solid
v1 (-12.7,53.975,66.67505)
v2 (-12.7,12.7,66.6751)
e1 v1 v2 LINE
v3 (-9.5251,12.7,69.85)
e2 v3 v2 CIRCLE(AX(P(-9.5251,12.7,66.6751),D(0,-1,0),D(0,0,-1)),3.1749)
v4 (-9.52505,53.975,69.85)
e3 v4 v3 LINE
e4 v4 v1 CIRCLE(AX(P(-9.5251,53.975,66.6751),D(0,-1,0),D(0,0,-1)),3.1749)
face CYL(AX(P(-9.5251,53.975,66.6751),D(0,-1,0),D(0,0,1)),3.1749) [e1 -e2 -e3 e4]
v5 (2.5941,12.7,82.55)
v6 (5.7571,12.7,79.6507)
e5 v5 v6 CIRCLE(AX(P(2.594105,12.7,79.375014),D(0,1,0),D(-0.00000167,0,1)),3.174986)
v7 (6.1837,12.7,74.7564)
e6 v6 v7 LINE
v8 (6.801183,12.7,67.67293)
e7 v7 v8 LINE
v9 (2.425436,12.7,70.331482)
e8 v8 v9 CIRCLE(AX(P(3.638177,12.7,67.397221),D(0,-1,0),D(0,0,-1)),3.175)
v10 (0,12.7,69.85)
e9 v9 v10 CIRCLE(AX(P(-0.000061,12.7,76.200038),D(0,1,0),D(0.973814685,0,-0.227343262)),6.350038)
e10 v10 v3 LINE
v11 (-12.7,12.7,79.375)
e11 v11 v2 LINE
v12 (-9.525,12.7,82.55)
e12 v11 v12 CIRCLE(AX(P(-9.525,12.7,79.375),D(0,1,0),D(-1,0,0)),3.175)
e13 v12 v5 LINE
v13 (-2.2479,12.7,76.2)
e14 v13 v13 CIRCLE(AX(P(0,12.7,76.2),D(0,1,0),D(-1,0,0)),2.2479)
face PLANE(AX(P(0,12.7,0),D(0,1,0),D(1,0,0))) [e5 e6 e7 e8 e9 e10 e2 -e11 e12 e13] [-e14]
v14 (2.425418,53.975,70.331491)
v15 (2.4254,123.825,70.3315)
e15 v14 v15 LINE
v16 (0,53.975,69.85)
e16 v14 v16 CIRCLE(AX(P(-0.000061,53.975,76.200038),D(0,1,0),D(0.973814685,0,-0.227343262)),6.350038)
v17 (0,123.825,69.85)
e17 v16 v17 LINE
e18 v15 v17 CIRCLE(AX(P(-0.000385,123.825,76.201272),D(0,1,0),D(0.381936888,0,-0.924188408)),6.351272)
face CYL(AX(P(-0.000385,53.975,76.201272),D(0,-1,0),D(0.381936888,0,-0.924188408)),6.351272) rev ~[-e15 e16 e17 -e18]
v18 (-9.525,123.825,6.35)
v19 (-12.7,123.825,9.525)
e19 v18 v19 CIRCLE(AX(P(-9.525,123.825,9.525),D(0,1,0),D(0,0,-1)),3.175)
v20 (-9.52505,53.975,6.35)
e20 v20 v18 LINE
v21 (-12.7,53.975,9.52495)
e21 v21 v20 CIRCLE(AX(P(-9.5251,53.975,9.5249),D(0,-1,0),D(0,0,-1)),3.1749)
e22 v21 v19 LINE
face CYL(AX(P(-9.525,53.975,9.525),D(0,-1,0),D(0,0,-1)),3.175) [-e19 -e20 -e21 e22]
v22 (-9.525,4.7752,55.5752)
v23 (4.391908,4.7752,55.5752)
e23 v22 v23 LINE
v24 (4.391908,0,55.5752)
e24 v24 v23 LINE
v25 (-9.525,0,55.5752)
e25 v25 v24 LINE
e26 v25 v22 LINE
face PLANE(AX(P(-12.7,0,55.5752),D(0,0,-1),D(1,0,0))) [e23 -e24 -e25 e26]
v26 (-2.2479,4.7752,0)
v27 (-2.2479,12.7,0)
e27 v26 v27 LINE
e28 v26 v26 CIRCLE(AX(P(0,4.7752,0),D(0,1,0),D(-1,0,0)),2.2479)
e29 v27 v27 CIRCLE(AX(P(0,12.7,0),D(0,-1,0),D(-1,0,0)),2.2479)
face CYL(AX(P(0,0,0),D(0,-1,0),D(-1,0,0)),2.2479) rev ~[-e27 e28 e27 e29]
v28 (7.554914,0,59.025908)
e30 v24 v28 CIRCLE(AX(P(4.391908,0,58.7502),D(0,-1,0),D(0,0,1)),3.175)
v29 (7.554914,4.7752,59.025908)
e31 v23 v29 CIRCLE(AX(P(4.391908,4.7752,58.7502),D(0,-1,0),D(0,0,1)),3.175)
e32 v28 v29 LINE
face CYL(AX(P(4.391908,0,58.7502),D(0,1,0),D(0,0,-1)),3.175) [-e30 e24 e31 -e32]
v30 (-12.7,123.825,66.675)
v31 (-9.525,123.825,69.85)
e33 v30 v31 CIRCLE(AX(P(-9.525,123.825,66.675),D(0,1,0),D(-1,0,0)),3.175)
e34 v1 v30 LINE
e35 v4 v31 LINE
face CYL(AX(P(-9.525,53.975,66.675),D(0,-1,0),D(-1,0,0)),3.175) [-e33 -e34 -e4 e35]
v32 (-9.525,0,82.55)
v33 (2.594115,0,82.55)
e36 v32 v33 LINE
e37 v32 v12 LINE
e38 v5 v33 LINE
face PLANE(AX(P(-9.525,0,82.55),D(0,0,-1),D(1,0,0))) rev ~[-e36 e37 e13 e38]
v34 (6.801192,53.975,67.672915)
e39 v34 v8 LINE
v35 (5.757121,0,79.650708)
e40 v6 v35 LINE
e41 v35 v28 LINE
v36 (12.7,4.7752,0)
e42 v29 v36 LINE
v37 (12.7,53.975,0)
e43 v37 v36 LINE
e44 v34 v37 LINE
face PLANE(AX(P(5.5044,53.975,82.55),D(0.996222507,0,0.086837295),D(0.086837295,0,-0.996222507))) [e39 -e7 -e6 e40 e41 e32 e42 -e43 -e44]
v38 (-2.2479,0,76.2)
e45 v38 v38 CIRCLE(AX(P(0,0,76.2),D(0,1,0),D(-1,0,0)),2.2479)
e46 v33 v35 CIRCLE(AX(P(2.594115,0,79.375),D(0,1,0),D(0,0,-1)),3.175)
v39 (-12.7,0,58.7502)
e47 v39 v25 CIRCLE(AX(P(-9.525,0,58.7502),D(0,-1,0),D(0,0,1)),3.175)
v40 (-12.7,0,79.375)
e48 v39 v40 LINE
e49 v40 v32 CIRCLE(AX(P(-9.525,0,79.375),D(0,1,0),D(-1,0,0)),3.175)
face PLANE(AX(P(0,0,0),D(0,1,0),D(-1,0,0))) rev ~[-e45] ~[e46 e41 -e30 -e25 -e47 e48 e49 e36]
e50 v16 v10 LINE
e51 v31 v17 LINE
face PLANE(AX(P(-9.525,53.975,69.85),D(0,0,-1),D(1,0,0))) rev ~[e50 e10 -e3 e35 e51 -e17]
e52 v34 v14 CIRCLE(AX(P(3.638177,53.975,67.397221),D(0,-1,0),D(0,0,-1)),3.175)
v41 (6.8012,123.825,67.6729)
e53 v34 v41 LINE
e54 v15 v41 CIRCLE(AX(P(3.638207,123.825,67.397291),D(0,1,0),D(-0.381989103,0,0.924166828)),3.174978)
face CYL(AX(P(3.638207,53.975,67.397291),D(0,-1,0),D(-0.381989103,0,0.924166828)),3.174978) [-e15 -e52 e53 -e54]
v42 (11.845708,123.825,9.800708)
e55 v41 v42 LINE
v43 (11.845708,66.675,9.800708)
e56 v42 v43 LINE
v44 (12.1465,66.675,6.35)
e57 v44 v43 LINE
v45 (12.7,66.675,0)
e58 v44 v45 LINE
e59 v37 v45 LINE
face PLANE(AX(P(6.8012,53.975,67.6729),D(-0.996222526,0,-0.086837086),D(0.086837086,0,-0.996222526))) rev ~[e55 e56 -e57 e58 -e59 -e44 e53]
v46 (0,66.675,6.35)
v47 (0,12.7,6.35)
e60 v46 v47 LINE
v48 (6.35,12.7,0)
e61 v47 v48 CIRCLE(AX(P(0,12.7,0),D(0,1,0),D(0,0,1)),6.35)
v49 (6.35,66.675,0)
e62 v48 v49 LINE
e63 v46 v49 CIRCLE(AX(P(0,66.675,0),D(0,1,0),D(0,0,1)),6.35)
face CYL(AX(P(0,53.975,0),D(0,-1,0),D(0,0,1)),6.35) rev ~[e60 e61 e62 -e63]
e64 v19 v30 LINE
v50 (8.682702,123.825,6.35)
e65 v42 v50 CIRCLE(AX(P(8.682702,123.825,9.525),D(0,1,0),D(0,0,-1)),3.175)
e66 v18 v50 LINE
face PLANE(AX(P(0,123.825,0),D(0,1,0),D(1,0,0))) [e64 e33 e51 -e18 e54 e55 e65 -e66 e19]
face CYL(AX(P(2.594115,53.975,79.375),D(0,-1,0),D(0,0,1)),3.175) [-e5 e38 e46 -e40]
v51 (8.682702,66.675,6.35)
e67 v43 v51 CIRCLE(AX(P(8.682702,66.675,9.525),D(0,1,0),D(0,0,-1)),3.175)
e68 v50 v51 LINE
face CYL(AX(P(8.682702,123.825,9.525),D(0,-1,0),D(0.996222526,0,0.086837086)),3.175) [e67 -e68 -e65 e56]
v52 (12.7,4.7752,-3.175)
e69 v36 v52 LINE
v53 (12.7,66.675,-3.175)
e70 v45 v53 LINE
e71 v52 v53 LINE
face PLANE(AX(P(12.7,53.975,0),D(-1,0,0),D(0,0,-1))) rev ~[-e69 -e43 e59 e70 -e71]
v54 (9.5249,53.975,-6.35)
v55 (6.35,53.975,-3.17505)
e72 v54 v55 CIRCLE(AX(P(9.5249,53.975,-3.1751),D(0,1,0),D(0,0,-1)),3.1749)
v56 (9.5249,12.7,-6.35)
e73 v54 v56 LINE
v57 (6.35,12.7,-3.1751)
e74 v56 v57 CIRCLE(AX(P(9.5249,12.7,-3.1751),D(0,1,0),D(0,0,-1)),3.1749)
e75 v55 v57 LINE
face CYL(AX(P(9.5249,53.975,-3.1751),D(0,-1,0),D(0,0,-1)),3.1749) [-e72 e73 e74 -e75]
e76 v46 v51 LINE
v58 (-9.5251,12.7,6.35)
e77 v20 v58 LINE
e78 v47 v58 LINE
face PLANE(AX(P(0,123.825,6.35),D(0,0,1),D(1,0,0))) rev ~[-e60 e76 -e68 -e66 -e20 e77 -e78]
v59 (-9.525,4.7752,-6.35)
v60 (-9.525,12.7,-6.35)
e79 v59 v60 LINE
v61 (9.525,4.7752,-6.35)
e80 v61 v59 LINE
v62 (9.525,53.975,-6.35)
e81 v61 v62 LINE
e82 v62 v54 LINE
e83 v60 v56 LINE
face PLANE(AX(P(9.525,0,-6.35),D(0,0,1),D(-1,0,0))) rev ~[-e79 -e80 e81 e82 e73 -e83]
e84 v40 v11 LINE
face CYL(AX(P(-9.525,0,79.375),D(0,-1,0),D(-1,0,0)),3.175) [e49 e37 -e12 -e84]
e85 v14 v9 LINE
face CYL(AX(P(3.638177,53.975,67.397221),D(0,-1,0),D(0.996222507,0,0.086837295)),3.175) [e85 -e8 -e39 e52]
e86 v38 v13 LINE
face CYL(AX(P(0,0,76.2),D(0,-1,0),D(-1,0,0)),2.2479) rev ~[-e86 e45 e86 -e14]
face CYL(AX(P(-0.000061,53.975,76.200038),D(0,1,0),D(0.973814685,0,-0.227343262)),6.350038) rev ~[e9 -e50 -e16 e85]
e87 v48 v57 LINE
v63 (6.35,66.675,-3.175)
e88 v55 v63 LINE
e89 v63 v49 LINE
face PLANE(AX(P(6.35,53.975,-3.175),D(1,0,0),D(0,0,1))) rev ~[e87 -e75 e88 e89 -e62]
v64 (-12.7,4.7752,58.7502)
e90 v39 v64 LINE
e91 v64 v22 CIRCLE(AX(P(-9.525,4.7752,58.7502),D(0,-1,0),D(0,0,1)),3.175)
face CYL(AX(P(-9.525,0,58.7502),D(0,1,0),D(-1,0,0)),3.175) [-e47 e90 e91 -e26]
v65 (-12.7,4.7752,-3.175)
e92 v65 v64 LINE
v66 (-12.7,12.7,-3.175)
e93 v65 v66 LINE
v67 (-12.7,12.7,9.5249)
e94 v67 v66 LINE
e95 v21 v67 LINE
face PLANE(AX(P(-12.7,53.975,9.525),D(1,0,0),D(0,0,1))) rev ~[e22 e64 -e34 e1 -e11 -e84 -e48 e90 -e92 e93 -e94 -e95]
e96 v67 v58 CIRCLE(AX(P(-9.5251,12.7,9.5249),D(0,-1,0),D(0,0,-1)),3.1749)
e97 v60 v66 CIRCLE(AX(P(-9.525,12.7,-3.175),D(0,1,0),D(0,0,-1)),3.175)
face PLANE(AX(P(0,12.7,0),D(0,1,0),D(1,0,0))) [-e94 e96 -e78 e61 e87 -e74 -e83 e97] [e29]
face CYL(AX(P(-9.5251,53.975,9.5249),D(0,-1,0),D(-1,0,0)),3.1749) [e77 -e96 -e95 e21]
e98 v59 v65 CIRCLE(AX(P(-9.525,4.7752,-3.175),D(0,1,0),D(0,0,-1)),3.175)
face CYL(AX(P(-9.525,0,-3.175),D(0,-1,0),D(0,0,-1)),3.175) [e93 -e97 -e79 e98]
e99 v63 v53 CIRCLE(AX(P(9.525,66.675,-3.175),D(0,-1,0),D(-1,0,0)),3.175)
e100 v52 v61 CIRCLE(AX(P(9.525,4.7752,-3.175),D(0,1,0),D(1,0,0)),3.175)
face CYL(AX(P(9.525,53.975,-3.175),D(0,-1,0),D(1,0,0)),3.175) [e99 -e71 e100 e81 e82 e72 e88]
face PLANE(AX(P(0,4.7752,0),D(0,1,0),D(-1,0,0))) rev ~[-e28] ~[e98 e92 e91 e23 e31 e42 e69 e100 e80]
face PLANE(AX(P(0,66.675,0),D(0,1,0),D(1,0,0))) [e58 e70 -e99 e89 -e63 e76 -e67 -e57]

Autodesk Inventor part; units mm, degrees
ref_plane "YZ Plane" through (0, 0, 0) normal (1, 0, 0) x (0, 1, 0)
ref_plane "XZ Plane" through (0, 0, 0) normal (0, 1, 0) x (-1, 0, 0)
ref_plane "XY Plane" through (0, 0, 0) normal (0, 0, 1) x (1, 0, 0)
sketch "Sketch1" plane through (0, 0, 0) normal (0, 1, 0) x (-1, 0, 0)
  circle A0 centre (0, 0) radius 2.2479
  line L0 (0, 0) -> (0, 76.2) construction
  circle A1 centre (0, 76.2) radius 2.2479
  line L1 (9.525, 82.55) -> (-9.525, 82.55)
  line L2 (-12.7, 79.375) -> (-12.7, -3.175)
  line L3 (-9.525, -6.35) -> (9.525, -6.35)
  line L4 (12.7, -3.175) -> (12.7, 79.375)
  line L5 (0, 0) -> (0, 55.5752) construction
  line L6 (12.7, 55.5752) -> (-12.7, 55.5752) construction
  line L7 (12.7, 55.5752) -> (-12.7, 55.5752)
  arc A2 (12.7, 79.375) -> (9.525, 82.55) centre (9.525, 79.375) ccw
  arc A3 (-9.525, 82.55) -> (-12.7, 79.375) centre (-9.525, 79.375) ccw
  arc A4 (9.525, -6.35) -> (12.7, -3.175) centre (9.525, -3.175) ccw
  arc A5 (-12.7, -3.175) -> (-9.525, -6.35) centre (-9.525, -3.175) ccw
  point P0 (-12.7, -6.35)
  point P1 (12.7, -6.35)
  dimension "d0" = 4.4958
  dimension "d1" = 4.4958
  dimension "d2" = 76.2
  dimension "d3" = 25.4
  dimension "d4" = 12.7
  dimension "d5" = 6.35
  dimension "d6" = 6.35
  dimension "d7" = 55.5752
  dimension "d8" = 3.175
extrude "Extrusion1" add sketch "Sketch1" along normal blind 53.975
sketch "Sketch2" plane through (0, 53.975, 0) normal (0, 1, 0) x (1, 0, 0)
  line L0 (12.7, -79.375) -> (12.7, 3.175) projected
  arc A0 (12.7, 3.175) -> (9.525, 6.35) centre (9.525, 3.175) ccw projected
  line L1 (9.525, 6.35) -> (-9.525, 6.35) projected
  arc A1 (-9.525, 6.35) -> (-12.7, 3.175) centre (-9.525, 3.175) ccw projected
  line L2 (-12.7, 3.175) -> (-12.7, -79.375) projected
  arc A2 (-12.7, -79.375) -> (-9.525, -82.55) centre (-9.525, -79.375) ccw projected
  line L3 (-9.525, -82.55) -> (9.525, -82.55) projected
  arc A3 (9.525, -82.55) -> (12.7, -79.375) centre (9.525, -79.375) ccw projected
  circle A4 centre (0, 0) radius 2.2479 projected
  circle A5 centre (0, -76.2) radius 2.2479 projected
  line L4 (5.5044, -82.55) -> (12.7, 0)
  line L5 (12.7, -79.375) -> (12.7, 3.175) projected
  line L6 (-12.7, 0) -> (12.7, 0) construction
  line L7 (2.2479, -76.2) -> (6.0579, -76.2) construction
  line L8 (5.5044, -82.55) -> (12.7, -82.55)
  line L9 (12.7, -82.55) -> (12.7, 0)
  point P0 (12.7, 0)
  dimension "d14" = 3.81
extrude "Extrusion3" cut sketch "Sketch2" against normal through all contours A3 L3 L4 L0
fillet "Fillet2" radius 3.175 1 edges at (5.5044, 26.9875, 82.55)
sketch "Sketch3" plane through (0, 53.975, 0) normal (0, 1, 0) x (1, 0, 0)
  point P0 (0, 0)
extrude "Extrusion4" cut sketch "Sketch1" along normal blind 4.7752 contours L4 A4 L3 A5 L2 L7
fillet "Fillet3" radius 3.175 2 edges at (7.8557, 2.3876, 55.5752) (-12.7, 2.3876, 55.5752)
sketch "Sketch5" plane through (0, 53.975, 0) normal (0, 1, 0) x (1, 0, 0)
  circle A0 centre (0, -76.2) radius 2.2479 projected
  circle A1 centre (0, 0) radius 2.2479 projected
  arc A2 (2.5941, -82.55) -> (5.7571, -79.6507) centre (2.5941, -79.375) ccw projected
  line L0 (5.7571, -79.6507) -> (12.7, 0) projected
  line L1 (12.7, 0) -> (12.7, 3.175) projected
  arc A3 (12.7, 3.175) -> (9.525, 6.35) centre (9.525, 3.175) ccw projected
  line L2 (9.525, 6.35) -> (-9.525, 6.35) projected
  arc A4 (-9.525, 6.35) -> (-12.7, 3.175) centre (-9.525, 3.175) ccw projected
  line L3 (-12.7, 3.175) -> (-12.7, -79.375) projected
  arc A5 (-12.7, -79.375) -> (-9.525, -82.55) centre (-9.525, -79.375) ccw projected
  line L4 (-9.525, -82.55) -> (2.5941, -82.55) projected
  circle A6 centre (0, 0) radius 6.35 construction
  line L5 (6.35, 0) -> (6.35, 6.35)
  line L6 (0, -6.35) -> (-12.7, -6.35)
  arc A7 (0, -6.35) -> (6.35, 0) centre (0, 0) ccw
  line L7 (6.35, 6.35) -> (-12.7, 6.35)
  line L8 (-12.7, 6.35) -> (-12.7, -6.35)
  circle A8 centre (0, -76.2) radius 6.35 construction
  line L9 (0, -69.85) -> (-12.7, -69.85)
  line L10 (6.1837, -74.7564) -> (5.5044, -82.55)
  line L11 (5.5044, -82.55) -> (-12.7, -82.55)
  line L12 (-12.7, -82.55) -> (-12.7, -69.85)
  line L13 (-9.525, -82.55) -> (2.5941, -82.55) projected
  arc A9 (6.1837, -74.7564) -> (0, -69.85) centre (0, -76.2) ccw
  dimension "d21" = 12.7
  dimension "d22" = 12.7
extrude "Extrusion5" cut sketch "Sketch5" against normal blind 41.275 contours L4 A5 L3 L9 A9 L0 A2 | L3 A4 L2 L5 A7 L6
fillet "Fillet4" radius 3.175 1 edges at (6.1837, 33.3375, 74.7564)
fillet "Fillet5" radius 3.175 3 edges at (-12.7, 33.3375, 69.85) (-12.7, 33.3375, 6.35) (6.35, 33.3375, -6.35)
sketch "Sketch6" plane through (0, 53.975, 0) normal (0, 1, 0) x (1, 0, 0)
  arc A0 (12.7, 3.175) -> (6.35, 3.175) centre (9.525, 3.175) ccw projected
  line L0 (6.35, 3.175) -> (6.35, 0) projected
  arc A1 (0, -6.35) -> (6.35, 0) centre (0, 0) ccw projected
  line L1 (0, -6.35) -> (-9.525, -6.35) projected
  arc A2 (-9.525, -6.35) -> (-12.7, -9.525) centre (-9.525, -9.525) ccw projected
  line L2 (-12.7, -9.525) -> (-12.7, -66.675) projected
  arc A3 (-12.7, -66.675) -> (-9.525, -69.85) centre (-9.525, -66.675) ccw projected
  line L3 (-9.525, -69.85) -> (0, -69.85) projected
  arc A4 (2.4254, -70.3315) -> (0, -69.85) centre (0, -76.2) ccw projected
  arc A5 (2.4254, -70.3315) -> (6.8012, -67.6729) centre (3.6382, -67.3972) ccw projected
  line L4 (6.8012, -67.6729) -> (12.7, 0) projected
  line L5 (12.7, 0) -> (12.7, 3.175) projected
  point P0 (0, 0)
extrude "Extrusion6" add sketch "Sketch6" along normal blind 69.85
sketch "Sketch7" plane through (0, 123.825, 0) normal (0, 1, 0) x (1, 0, 0)
  line L0 (6.8012, -67.6729) -> (12.7, 0) projected
  line L1 (12.7, 0) -> (12.7, 3.175) projected
  arc A0 (12.7, 3.175) -> (6.35, 3.175) centre (9.525, 3.175) ccw projected
  line L2 (6.35, 3.175) -> (6.35, 0) projected
  arc A1 (0, -6.35) -> (6.35, 0) centre (0, 0) ccw projected
  line L3 (0, -6.35) -> (-9.525, -6.35) projected
  arc A2 (-9.525, -6.35) -> (-12.7, -9.525) centre (-9.525, -9.525) ccw projected
  line L4 (-12.7, -9.525) -> (-12.7, -66.675) projected
  arc A3 (-12.7, -66.675) -> (-9.525, -69.85) centre (-9.525, -66.675) ccw projected
  line L5 (-9.525, -69.85) -> (0, -69.85) projected
  arc A4 (2.4254, -70.3315) -> (0, -69.85) centre (0, -76.2) ccw projected
  arc A5 (2.4254, -70.3315) -> (6.8012, -67.6729) centre (3.6382, -67.3972) ccw projected
  line L6 (6.35, 0) -> (6.35, 3.175)
  arc A6 (9.525, 6.35) -> (6.35, 3.175) centre (9.525, 3.175) ccw projected
  line L7 (12.7, 0) -> (12.7, 3.175)
  arc A7 (12.7, 3.175) -> (6.35, 3.175) centre (9.525, 3.175) ccw
  line L8 (0, -6.35) -> (12.1465, -6.35)
  arc A8 (0, -6.35) -> (6.35, 0) centre (0, 0) ccw projected
  line L9 (12.1465, -6.35) -> (12.7, 0)
  arc A9 (0, -6.35) -> (6.35, 0) centre (0, 0) ccw
  point P0 (0, 0)
extrude "Extrusion8" cut sketch "Sketch7" against normal blind 57.15 contours L8 A1 L2 A0 L1 L0
fillet "Fillet6" radius 3.175 1 edges at (12.1465, 95.25, 6.35)
properties part number "INtk_016_PelletDeflector1" material "PC/ABS Plastic"
